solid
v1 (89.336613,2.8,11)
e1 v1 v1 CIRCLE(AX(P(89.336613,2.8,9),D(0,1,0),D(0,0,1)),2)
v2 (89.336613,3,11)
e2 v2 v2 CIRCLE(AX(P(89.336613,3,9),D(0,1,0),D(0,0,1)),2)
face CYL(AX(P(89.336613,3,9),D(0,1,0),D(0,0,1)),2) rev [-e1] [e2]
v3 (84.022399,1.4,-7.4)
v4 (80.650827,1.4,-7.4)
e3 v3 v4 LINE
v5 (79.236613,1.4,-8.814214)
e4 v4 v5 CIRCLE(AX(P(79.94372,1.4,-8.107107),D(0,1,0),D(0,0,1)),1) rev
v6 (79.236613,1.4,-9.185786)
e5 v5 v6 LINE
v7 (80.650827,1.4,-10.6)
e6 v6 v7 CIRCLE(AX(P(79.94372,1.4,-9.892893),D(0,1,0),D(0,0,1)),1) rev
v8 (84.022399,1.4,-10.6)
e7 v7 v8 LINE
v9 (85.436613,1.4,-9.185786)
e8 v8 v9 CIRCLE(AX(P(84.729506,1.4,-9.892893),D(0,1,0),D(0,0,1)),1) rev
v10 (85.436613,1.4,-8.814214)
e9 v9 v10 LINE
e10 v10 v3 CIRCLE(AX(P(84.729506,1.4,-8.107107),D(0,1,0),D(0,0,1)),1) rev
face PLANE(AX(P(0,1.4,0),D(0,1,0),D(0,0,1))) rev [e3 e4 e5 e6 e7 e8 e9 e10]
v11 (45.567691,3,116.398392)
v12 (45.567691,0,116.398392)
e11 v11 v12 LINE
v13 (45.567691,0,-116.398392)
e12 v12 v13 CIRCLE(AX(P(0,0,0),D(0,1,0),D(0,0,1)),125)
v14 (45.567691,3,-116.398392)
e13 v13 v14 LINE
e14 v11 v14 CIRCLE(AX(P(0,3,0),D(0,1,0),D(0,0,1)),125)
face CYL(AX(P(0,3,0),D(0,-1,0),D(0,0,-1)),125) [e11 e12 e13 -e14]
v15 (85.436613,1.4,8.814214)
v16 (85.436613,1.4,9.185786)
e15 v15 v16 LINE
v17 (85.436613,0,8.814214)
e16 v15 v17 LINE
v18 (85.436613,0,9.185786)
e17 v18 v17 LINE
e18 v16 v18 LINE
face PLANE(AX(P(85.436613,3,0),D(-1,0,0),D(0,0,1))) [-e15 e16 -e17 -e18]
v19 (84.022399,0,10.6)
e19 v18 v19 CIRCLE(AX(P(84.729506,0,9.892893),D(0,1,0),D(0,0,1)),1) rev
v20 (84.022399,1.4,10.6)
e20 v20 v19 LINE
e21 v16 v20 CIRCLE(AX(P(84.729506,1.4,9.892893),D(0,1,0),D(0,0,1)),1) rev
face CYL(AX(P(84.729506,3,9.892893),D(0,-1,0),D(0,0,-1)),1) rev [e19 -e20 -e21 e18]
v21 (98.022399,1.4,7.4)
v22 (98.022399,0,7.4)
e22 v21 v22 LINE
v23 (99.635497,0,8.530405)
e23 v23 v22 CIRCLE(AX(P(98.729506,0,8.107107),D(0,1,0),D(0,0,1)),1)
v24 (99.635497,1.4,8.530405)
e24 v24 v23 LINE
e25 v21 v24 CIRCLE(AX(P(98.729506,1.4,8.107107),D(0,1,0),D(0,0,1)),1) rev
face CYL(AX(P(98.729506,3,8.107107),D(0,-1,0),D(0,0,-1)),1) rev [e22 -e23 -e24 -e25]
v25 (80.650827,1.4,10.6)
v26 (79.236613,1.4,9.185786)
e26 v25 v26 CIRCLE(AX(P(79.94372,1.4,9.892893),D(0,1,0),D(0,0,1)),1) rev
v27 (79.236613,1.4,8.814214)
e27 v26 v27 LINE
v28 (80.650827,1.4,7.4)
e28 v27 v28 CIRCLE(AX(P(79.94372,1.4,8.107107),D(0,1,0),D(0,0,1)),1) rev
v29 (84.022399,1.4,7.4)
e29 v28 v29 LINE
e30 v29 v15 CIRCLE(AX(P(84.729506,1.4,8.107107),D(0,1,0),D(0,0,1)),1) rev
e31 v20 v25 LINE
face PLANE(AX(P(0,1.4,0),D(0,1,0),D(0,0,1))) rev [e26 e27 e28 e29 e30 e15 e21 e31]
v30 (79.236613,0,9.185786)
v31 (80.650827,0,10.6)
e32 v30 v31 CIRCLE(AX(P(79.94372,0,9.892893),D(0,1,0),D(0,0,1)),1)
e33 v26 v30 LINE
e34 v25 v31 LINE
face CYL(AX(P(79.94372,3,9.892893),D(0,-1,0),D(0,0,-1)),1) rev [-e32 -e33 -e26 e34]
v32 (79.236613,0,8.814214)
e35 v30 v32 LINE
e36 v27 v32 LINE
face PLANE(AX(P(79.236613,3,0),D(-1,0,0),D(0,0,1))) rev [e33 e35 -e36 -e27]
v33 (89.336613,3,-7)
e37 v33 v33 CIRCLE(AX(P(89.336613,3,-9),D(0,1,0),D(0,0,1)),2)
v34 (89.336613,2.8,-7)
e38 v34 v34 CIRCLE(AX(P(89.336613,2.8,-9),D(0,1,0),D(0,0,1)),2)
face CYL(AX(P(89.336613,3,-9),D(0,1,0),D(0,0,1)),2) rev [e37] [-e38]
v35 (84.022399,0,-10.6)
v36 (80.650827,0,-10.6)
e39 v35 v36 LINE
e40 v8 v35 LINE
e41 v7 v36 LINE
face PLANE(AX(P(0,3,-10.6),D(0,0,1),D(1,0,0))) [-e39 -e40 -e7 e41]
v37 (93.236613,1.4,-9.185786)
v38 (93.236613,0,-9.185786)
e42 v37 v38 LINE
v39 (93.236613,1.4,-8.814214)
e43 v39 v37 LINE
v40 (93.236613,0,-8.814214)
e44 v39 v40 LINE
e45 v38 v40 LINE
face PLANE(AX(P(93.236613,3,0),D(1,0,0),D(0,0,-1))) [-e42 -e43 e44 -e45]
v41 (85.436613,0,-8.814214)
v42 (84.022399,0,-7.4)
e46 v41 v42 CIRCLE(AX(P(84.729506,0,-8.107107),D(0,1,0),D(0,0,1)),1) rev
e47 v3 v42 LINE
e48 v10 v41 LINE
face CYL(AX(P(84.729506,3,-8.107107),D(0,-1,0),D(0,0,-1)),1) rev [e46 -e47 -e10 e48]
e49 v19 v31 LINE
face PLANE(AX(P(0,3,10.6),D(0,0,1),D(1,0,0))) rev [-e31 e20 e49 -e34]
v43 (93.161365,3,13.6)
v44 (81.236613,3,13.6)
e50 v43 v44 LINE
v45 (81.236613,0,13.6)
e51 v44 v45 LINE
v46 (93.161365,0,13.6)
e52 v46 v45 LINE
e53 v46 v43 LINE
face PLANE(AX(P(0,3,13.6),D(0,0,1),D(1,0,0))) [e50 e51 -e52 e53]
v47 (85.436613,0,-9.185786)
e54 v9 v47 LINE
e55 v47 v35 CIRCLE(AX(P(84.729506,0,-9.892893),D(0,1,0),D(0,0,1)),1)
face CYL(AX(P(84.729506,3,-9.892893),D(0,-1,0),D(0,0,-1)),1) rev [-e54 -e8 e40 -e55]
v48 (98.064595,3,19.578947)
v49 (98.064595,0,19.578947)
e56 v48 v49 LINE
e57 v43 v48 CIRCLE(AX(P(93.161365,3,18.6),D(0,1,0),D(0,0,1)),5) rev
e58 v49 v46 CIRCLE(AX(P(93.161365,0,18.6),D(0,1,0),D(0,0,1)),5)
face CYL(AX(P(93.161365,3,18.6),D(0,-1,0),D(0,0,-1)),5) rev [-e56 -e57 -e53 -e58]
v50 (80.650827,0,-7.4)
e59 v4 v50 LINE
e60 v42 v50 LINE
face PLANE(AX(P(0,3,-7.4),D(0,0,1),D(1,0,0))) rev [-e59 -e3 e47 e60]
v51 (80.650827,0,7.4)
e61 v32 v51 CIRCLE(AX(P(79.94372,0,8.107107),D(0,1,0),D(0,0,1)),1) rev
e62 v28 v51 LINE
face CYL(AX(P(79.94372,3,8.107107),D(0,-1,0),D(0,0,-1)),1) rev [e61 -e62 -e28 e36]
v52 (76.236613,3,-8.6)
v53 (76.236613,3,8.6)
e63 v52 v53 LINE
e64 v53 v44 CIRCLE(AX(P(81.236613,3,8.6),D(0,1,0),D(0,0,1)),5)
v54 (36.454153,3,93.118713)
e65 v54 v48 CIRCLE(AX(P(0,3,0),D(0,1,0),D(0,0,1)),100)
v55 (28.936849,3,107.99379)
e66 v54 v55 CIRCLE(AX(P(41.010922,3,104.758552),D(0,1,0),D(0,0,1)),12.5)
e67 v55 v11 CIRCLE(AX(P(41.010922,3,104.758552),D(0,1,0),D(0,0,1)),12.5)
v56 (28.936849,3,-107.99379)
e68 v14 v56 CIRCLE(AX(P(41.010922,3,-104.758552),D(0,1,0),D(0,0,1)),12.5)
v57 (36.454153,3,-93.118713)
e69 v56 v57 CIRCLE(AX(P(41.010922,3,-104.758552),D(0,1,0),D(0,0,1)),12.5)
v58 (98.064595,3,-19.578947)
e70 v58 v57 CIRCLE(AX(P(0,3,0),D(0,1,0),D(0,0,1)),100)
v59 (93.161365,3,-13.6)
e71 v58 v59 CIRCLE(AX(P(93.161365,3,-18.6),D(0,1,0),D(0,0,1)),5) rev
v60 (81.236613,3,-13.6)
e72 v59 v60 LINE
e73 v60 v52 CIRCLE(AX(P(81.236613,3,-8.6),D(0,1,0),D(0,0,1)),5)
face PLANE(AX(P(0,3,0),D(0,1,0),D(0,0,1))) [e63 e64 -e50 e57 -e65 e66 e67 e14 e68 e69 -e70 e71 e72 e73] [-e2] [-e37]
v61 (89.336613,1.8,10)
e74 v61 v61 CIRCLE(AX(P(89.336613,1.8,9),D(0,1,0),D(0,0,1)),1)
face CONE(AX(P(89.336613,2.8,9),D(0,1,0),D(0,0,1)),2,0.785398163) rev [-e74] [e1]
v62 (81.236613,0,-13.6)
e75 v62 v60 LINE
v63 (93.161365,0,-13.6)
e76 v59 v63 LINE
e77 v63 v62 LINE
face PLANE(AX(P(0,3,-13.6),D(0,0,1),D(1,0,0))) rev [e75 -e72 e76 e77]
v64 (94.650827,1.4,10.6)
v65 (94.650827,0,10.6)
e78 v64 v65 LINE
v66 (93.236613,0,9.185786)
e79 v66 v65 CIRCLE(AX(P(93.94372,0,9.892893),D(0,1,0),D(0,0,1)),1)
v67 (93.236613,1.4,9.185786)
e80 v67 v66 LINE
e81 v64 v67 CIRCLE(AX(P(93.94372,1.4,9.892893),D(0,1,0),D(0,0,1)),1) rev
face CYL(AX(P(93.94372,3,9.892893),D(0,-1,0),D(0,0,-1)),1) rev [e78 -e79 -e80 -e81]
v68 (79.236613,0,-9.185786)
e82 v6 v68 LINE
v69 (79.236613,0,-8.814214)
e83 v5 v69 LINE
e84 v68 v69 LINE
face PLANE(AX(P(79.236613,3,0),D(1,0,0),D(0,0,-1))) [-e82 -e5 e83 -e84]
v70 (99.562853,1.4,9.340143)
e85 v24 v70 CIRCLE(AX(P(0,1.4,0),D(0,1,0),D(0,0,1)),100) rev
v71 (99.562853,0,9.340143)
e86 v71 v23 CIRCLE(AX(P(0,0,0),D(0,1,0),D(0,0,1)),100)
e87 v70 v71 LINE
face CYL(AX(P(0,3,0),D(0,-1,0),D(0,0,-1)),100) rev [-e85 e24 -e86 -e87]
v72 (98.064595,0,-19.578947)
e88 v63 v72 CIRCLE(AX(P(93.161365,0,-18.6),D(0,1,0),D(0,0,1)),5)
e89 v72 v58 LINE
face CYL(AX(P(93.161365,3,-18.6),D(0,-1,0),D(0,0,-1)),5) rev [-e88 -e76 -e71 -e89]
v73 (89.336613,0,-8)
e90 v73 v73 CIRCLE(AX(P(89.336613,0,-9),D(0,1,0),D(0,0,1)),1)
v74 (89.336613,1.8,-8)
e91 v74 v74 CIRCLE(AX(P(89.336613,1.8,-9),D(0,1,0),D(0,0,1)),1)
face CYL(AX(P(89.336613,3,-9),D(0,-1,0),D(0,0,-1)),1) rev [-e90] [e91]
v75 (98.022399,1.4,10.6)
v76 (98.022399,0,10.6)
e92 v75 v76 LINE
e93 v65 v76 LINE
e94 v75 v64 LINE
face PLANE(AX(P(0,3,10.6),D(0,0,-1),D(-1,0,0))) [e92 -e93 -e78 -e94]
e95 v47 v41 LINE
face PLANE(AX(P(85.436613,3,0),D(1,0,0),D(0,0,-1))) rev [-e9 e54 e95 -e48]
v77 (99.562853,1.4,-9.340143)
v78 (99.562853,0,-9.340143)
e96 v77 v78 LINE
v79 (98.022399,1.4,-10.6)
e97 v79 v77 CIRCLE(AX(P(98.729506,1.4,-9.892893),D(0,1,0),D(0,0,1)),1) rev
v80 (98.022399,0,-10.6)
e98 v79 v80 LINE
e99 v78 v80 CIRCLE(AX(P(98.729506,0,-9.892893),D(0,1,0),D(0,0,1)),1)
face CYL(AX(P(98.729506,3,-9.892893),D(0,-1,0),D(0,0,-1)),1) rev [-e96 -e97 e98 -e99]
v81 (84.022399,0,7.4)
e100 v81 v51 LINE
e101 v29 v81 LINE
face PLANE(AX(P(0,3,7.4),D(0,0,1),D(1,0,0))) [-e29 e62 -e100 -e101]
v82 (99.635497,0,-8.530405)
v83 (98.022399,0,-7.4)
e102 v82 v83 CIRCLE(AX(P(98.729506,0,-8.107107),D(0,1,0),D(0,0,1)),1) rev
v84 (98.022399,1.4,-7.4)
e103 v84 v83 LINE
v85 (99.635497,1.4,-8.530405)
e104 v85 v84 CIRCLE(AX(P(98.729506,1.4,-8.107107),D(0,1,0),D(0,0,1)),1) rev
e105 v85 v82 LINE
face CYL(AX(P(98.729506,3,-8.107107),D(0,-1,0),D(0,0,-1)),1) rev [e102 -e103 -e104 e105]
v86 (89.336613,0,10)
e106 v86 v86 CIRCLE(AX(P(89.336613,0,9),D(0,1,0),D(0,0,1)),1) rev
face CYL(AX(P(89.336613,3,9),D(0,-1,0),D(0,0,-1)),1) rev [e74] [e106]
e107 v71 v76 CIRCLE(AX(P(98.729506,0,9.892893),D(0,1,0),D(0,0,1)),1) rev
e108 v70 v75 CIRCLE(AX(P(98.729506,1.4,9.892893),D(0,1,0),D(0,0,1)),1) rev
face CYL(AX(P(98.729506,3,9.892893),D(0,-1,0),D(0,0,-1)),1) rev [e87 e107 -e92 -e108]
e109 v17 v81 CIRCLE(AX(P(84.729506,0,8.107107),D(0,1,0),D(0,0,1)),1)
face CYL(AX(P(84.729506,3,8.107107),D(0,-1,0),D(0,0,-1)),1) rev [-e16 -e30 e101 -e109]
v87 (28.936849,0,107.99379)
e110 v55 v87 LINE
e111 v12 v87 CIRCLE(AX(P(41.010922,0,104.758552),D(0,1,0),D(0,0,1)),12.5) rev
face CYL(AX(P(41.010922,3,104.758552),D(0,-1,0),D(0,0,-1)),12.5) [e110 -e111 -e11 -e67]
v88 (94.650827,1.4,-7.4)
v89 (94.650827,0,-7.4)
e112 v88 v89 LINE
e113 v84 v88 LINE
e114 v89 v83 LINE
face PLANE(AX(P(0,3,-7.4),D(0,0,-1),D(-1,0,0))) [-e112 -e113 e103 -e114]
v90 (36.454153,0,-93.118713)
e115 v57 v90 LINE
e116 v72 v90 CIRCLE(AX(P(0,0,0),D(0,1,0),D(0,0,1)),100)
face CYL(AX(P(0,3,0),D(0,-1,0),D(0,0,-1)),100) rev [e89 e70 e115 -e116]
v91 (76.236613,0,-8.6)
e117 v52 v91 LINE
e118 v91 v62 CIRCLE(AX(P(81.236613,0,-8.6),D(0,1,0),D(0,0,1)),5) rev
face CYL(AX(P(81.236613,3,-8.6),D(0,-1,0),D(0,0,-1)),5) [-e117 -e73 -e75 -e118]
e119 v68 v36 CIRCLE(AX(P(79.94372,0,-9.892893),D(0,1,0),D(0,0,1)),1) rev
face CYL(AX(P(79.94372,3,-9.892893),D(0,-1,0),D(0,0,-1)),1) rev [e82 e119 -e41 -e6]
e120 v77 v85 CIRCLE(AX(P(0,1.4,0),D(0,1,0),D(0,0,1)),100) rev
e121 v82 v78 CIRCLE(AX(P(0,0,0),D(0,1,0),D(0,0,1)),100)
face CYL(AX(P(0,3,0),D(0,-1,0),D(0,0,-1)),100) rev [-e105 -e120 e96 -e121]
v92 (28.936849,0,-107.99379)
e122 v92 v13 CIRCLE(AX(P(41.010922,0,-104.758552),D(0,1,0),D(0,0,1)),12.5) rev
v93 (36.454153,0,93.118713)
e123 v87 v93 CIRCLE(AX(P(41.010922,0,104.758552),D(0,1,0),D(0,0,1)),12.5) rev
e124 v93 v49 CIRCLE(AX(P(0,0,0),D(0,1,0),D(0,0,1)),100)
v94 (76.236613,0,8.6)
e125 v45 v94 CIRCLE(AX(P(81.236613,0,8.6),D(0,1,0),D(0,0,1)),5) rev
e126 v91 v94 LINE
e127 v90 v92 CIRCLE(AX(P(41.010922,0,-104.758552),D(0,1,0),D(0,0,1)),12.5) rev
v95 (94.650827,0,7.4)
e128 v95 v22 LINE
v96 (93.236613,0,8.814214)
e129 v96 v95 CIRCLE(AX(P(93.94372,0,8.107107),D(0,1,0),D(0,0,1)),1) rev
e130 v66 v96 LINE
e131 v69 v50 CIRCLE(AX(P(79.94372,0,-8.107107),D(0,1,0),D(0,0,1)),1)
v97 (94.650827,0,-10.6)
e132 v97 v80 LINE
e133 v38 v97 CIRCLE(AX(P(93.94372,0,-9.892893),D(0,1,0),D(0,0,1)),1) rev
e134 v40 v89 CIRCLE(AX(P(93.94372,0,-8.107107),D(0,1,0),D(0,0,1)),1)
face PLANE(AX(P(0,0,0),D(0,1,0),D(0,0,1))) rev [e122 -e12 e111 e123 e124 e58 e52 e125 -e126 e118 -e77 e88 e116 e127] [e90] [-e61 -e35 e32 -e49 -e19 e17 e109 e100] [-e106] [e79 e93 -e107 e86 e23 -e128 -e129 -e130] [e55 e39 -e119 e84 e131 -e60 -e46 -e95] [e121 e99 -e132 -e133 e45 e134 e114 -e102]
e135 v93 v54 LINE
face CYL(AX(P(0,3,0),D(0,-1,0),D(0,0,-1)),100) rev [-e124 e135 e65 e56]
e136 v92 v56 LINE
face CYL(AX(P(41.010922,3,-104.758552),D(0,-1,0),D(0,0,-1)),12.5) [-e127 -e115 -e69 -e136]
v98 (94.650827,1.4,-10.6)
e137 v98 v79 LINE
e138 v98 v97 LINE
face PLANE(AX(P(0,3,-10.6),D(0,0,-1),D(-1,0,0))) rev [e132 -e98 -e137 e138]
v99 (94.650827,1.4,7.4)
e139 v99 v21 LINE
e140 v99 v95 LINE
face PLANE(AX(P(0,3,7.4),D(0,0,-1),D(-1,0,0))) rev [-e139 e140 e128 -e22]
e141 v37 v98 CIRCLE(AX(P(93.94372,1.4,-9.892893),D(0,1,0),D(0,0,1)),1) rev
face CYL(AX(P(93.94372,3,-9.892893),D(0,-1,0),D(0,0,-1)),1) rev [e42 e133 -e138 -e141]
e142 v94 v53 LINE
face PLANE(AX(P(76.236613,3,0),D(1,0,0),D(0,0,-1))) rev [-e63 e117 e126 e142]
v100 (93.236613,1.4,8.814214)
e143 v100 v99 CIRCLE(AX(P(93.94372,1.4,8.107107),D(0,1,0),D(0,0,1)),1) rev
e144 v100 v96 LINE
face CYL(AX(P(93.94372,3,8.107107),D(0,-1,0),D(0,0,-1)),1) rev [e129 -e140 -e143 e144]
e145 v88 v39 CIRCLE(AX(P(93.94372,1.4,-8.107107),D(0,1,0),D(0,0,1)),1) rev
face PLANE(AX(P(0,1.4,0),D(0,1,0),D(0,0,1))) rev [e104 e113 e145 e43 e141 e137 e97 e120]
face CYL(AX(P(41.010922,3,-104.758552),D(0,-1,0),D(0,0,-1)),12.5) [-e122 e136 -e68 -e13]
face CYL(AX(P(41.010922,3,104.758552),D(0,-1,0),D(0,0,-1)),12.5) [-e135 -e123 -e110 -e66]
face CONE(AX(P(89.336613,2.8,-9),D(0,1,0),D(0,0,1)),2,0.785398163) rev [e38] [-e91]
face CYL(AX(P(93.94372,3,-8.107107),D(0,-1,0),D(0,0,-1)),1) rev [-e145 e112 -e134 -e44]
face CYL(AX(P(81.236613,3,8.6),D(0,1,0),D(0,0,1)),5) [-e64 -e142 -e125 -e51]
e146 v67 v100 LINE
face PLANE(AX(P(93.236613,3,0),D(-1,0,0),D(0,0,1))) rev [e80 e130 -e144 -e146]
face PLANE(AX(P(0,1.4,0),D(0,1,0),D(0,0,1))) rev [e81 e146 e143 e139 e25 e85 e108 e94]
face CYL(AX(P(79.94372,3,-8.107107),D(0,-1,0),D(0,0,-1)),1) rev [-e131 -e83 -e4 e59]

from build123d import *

# Parameters (mm, degrees)
SKETCH1_R                                      = 1
BOSS_EXTRUDE1_DEPTH                            = 3
FILLET1_R                                      = 12.5
BOSS_EXTRUDE2_START                            = -1.6
BOSS_EXTRUDE2_DEPTH                            = 1.6
CSK_FOR_M2_FLAT_HEAD_MACHINE_SCREW1_AT_2_COUNT = 2
CSK_FOR_M2_FLAT_HEAD_MACHINE_SCREW1_AT_2_PITCH = 18
FILLET2_R                                      = 5


with BuildPart() as part:
    # Sketch1 → Boss-Extrude1 (new body)
    with BuildSketch(Plane(origin=(0, 0, 0), x_dir=(1, 0, 0), z_dir=(0, 1, 0))):
        with BuildLine():
            Line((32.352380638, 120.740728286), (25.88190451, 96.592582629))
            ThreePointArc((25.88190451, 96.592582629), (75.00161341, 66.141953296), (99.070883715, 13.6))
            Line((99.070883715, 13.6), (76.236612975, 13.6))
            Line((76.236612975, 13.6), (76.236612975, -13.6))
            Line((76.236612975, -13.6), (99.070883715, -13.6))
            ThreePointArc((99.070883715, -13.6), (75.00161341, -66.141953296), (25.88190451, -96.592582629))
            Line((25.88190451, -96.592582629), (32.352380638, -120.740728286))
            ThreePointArc((32.352380638, -120.740728286), (125, 0), (32.352380638, 120.740728286))
        make_face()
        with BuildLine():
            ThreePointArc((80.650826538, 7.4), (79.236612975, 7.4), (79.236612975, 8.814213562))
            Line((79.236612975, 8.814213562), (79.236612975, 9.185786438))
            ThreePointArc((79.236612975, 9.185786438), (79.236612975, 10.6), (80.650826538, 10.6))
            Line((80.650826538, 10.6), (84.022399413, 10.6))
            ThreePointArc((84.022399413, 10.6), (85.436612975, 10.6), (85.436612975, 9.185786438))
            Line((85.436612975, 9.185786438), (85.436612975, 8.814213562))
            ThreePointArc((85.436612975, 8.814213562), (85.436612975, 7.4), (84.022399413, 7.4))
            Line((84.022399413, 7.4), (80.650826538, 7.4))
        make_face(mode=Mode.SUBTRACT)
        with Locations(Location((89.336612975, 9, 0), (0, 0, 270))):
            Circle(SKETCH1_R, mode=Mode.SUBTRACT)
        with BuildLine():
            ThreePointArc((93.236612975, 9.185786438), (93.236612975, 10.6), (94.650826538, 10.6))
            Line((94.650826538, 10.6), (98.022399413, 10.6))
            ThreePointArc((98.022399413, 10.6), (99.362589189, 10.666977143), (99.56285316, 9.340142972))
            ThreePointArc((99.56285316, 9.340142972), (99.599997793, 8.93534776), (99.635496648, 8.530404901))
            ThreePointArc((99.635496648, 8.530404901), (99.303389883, 7.288169964), (98.022399413, 7.4))
            Line((98.022399413, 7.4), (94.650826538, 7.4))
            ThreePointArc((94.650826538, 7.4), (93.236612975, 7.4), (93.236612975, 8.814213562))
            Line((93.236612975, 8.814213562), (93.236612975, 9.185786438))
        make_face(mode=Mode.SUBTRACT)
        with BuildLine():
            ThreePointArc((98.022399413, -7.4), (99.303389883, -7.288169964), (99.635496648, -8.530404901))
            ThreePointArc((99.635496648, -8.530404901), (99.599997793, -8.93534776), (99.56285316, -9.340142972))
            ThreePointArc((99.56285316, -9.340142972), (99.362589189, -10.666977143), (98.022399413, -10.6))
            Line((98.022399413, -10.6), (94.650826538, -10.6))
            ThreePointArc((94.650826538, -10.6), (93.236612975, -10.6), (93.236612975, -9.185786438))
            Line((93.236612975, -9.185786438), (93.236612975, -8.814213562))
            ThreePointArc((93.236612975, -8.814213562), (93.236612975, -7.4), (94.650826538, -7.4))
            Line((94.650826538, -7.4), (98.022399413, -7.4))
        make_face(mode=Mode.SUBTRACT)
        with Locations(Location((89.336612975, -9, 0), (0, 0, 270))):
            Circle(SKETCH1_R, mode=Mode.SUBTRACT)
        with BuildLine():
            ThreePointArc((85.436612975, -9.185786438), (85.436612975, -10.6), (84.022399413, -10.6))
            Line((84.022399413, -10.6), (80.650826538, -10.6))
            ThreePointArc((80.650826538, -10.6), (79.236612975, -10.6), (79.236612975, -9.185786438))
            Line((79.236612975, -9.185786438), (79.236612975, -8.814213562))
            ThreePointArc((79.236612975, -8.814213562), (79.236612975, -7.4), (80.650826538, -7.4))
            Line((80.650826538, -7.4), (84.022399413, -7.4))
            ThreePointArc((84.022399413, -7.4), (85.436612975, -7.4), (85.436612975, -8.814213562))
            Line((85.436612975, -8.814213562), (85.436612975, -9.185786438))
        make_face(mode=Mode.SUBTRACT)
    extrude(amount=BOSS_EXTRUDE1_DEPTH)

    # Fillet1
    fillet1_edges = [part.edges().sort_by_distance(p)[0] for p in [
        (32.352380638, 1.5, 120.740728286),
        (25.88190451, 1.5, 96.592582629),
        (32.352380638, 1.5, -120.740728286),
        (25.88190451, 1.5, -96.592582629),
    ]]
    fillet(fillet1_edges, radius=FILLET1_R - 0.0001)  # a hair under: the kernel refuses the full size

    # Sketch2 → Boss-Extrude2 (add)
    with BuildSketch(Plane(origin=(0, 3, 0), x_dir=(1, 0, 0), z_dir=(0, 1, 0)).offset(BOSS_EXTRUDE2_START)):
        with BuildLine():
            Line((80.650826538, 7.4), (84.022399413, 7.4))
            ThreePointArc((84.022399413, 7.4), (85.436612975, 7.4), (85.436612975, 8.814213562))
            Line((85.436612975, 8.814213562), (85.436612975, 9.185786438))
            ThreePointArc((85.436612975, 9.185786438), (85.436612975, 10.6), (84.022399413, 10.6))
            Line((84.022399413, 10.6), (80.650826538, 10.6))
            ThreePointArc((80.650826538, 10.6), (79.236612975, 10.6), (79.236612975, 9.185786438))
            Line((79.236612975, 9.185786438), (79.236612975, 8.814213562))
            ThreePointArc((79.236612975, 8.814213562), (79.236612975, 7.4), (80.650826538, 7.4))
        make_face()
        with BuildLine():
            Line((93.236612975, 9.185786438), (93.236612975, 8.814213562))
            ThreePointArc((93.236612975, 8.814213562), (93.236612975, 7.4), (94.650826538, 7.4))
            Line((94.650826538, 7.4), (98.022399413, 7.4))
            ThreePointArc((98.022399413, 7.4), (99.303389883, 7.288169964), (99.635496648, 8.530404901))
            ThreePointArc((99.635496648, 8.530404901), (99.599997793, 8.93534776), (99.56285316, 9.340142972))
            ThreePointArc((99.56285316, 9.340142972), (99.362589189, 10.666977143), (98.022399413, 10.6))
            Line((98.022399413, 10.6), (94.650826538, 10.6))
            ThreePointArc((94.650826538, 10.6), (93.236612975, 10.6), (93.236612975, 9.185786438))
        make_face()
        with BuildLine():
            Line((84.022399413, -7.4), (80.650826538, -7.4))
            ThreePointArc((80.650826538, -7.4), (79.236612975, -7.4), (79.236612975, -8.814213562))
            Line((79.236612975, -8.814213562), (79.236612975, -9.185786438))
            ThreePointArc((79.236612975, -9.185786438), (79.236612975, -10.6), (80.650826538, -10.6))
            Line((80.650826538, -10.6), (84.022399413, -10.6))
            ThreePointArc((84.022399413, -10.6), (85.436612975, -10.6), (85.436612975, -9.185786438))
            Line((85.436612975, -9.185786438), (85.436612975, -8.814213562))
            ThreePointArc((85.436612975, -8.814213562), (85.436612975, -7.4), (84.022399413, -7.4))
        make_face()
        with BuildLine():
            Line((93.236612975, -8.814213562), (93.236612975, -9.185786438))
            ThreePointArc((93.236612975, -9.185786438), (93.236612975, -10.6), (94.650826538, -10.6))
            Line((94.650826538, -10.6), (98.022399413, -10.6))
            ThreePointArc((98.022399413, -10.6), (99.362589189, -10.666977143), (99.56285316, -9.340142972))
            ThreePointArc((99.56285316, -9.340142972), (99.599997793, -8.93534776), (99.635496648, -8.530404901))
            ThreePointArc((99.635496648, -8.530404901), (99.303389883, -7.288169964), (98.022399413, -7.4))
            Line((98.022399413, -7.4), (94.650826538, -7.4))
            ThreePointArc((94.650826538, -7.4), (93.236612975, -7.4), (93.236612975, -8.814213562))
        make_face()
    extrude(amount=BOSS_EXTRUDE2_DEPTH)

    # Sketch4 → CSK for M2 Flat Head Machine Screw1 (revolve, cut)
    with BuildSketch(Plane(origin=(89.336612975, 3, -9), x_dir=(0, 0, 1), z_dir=(1, 0, 0))):
        Polygon((0, 0), (0, 3), (1, 3), (1, 1.2), (2, 0.2), (2, 0), align=None)
    csk_for_m2_flat_head_machine_screw1 = revolve(axis=Axis((89.336612975, 9.35, -9), (0, -1, 0)), mode=Mode.SUBTRACT)

    # CSK for M2 Flat Head Machine Screw1 at 2: CSK for M2 Flat Head Machine Screw1 ×2
    with Locations(*[(0, 0, i * CSK_FOR_M2_FLAT_HEAD_MACHINE_SCREW1_AT_2_PITCH) for i in range(1, CSK_FOR_M2_FLAT_HEAD_MACHINE_SCREW1_AT_2_COUNT)]):
        add(csk_for_m2_flat_head_machine_screw1, mode=Mode.SUBTRACT)

    # Fillet2
    fillet2_edges = [part.edges().sort_by_distance(p)[0] for p in [
        (99.070883715, 1.5, -13.6),
        (99.070883715, 1.5, 13.6),
        (76.236612975, 1.5, 13.6),
        (76.236612975, 1.5, -13.6),
    ]]
    fillet(fillet2_edges, radius=FILLET2_R)


solid = part.part
